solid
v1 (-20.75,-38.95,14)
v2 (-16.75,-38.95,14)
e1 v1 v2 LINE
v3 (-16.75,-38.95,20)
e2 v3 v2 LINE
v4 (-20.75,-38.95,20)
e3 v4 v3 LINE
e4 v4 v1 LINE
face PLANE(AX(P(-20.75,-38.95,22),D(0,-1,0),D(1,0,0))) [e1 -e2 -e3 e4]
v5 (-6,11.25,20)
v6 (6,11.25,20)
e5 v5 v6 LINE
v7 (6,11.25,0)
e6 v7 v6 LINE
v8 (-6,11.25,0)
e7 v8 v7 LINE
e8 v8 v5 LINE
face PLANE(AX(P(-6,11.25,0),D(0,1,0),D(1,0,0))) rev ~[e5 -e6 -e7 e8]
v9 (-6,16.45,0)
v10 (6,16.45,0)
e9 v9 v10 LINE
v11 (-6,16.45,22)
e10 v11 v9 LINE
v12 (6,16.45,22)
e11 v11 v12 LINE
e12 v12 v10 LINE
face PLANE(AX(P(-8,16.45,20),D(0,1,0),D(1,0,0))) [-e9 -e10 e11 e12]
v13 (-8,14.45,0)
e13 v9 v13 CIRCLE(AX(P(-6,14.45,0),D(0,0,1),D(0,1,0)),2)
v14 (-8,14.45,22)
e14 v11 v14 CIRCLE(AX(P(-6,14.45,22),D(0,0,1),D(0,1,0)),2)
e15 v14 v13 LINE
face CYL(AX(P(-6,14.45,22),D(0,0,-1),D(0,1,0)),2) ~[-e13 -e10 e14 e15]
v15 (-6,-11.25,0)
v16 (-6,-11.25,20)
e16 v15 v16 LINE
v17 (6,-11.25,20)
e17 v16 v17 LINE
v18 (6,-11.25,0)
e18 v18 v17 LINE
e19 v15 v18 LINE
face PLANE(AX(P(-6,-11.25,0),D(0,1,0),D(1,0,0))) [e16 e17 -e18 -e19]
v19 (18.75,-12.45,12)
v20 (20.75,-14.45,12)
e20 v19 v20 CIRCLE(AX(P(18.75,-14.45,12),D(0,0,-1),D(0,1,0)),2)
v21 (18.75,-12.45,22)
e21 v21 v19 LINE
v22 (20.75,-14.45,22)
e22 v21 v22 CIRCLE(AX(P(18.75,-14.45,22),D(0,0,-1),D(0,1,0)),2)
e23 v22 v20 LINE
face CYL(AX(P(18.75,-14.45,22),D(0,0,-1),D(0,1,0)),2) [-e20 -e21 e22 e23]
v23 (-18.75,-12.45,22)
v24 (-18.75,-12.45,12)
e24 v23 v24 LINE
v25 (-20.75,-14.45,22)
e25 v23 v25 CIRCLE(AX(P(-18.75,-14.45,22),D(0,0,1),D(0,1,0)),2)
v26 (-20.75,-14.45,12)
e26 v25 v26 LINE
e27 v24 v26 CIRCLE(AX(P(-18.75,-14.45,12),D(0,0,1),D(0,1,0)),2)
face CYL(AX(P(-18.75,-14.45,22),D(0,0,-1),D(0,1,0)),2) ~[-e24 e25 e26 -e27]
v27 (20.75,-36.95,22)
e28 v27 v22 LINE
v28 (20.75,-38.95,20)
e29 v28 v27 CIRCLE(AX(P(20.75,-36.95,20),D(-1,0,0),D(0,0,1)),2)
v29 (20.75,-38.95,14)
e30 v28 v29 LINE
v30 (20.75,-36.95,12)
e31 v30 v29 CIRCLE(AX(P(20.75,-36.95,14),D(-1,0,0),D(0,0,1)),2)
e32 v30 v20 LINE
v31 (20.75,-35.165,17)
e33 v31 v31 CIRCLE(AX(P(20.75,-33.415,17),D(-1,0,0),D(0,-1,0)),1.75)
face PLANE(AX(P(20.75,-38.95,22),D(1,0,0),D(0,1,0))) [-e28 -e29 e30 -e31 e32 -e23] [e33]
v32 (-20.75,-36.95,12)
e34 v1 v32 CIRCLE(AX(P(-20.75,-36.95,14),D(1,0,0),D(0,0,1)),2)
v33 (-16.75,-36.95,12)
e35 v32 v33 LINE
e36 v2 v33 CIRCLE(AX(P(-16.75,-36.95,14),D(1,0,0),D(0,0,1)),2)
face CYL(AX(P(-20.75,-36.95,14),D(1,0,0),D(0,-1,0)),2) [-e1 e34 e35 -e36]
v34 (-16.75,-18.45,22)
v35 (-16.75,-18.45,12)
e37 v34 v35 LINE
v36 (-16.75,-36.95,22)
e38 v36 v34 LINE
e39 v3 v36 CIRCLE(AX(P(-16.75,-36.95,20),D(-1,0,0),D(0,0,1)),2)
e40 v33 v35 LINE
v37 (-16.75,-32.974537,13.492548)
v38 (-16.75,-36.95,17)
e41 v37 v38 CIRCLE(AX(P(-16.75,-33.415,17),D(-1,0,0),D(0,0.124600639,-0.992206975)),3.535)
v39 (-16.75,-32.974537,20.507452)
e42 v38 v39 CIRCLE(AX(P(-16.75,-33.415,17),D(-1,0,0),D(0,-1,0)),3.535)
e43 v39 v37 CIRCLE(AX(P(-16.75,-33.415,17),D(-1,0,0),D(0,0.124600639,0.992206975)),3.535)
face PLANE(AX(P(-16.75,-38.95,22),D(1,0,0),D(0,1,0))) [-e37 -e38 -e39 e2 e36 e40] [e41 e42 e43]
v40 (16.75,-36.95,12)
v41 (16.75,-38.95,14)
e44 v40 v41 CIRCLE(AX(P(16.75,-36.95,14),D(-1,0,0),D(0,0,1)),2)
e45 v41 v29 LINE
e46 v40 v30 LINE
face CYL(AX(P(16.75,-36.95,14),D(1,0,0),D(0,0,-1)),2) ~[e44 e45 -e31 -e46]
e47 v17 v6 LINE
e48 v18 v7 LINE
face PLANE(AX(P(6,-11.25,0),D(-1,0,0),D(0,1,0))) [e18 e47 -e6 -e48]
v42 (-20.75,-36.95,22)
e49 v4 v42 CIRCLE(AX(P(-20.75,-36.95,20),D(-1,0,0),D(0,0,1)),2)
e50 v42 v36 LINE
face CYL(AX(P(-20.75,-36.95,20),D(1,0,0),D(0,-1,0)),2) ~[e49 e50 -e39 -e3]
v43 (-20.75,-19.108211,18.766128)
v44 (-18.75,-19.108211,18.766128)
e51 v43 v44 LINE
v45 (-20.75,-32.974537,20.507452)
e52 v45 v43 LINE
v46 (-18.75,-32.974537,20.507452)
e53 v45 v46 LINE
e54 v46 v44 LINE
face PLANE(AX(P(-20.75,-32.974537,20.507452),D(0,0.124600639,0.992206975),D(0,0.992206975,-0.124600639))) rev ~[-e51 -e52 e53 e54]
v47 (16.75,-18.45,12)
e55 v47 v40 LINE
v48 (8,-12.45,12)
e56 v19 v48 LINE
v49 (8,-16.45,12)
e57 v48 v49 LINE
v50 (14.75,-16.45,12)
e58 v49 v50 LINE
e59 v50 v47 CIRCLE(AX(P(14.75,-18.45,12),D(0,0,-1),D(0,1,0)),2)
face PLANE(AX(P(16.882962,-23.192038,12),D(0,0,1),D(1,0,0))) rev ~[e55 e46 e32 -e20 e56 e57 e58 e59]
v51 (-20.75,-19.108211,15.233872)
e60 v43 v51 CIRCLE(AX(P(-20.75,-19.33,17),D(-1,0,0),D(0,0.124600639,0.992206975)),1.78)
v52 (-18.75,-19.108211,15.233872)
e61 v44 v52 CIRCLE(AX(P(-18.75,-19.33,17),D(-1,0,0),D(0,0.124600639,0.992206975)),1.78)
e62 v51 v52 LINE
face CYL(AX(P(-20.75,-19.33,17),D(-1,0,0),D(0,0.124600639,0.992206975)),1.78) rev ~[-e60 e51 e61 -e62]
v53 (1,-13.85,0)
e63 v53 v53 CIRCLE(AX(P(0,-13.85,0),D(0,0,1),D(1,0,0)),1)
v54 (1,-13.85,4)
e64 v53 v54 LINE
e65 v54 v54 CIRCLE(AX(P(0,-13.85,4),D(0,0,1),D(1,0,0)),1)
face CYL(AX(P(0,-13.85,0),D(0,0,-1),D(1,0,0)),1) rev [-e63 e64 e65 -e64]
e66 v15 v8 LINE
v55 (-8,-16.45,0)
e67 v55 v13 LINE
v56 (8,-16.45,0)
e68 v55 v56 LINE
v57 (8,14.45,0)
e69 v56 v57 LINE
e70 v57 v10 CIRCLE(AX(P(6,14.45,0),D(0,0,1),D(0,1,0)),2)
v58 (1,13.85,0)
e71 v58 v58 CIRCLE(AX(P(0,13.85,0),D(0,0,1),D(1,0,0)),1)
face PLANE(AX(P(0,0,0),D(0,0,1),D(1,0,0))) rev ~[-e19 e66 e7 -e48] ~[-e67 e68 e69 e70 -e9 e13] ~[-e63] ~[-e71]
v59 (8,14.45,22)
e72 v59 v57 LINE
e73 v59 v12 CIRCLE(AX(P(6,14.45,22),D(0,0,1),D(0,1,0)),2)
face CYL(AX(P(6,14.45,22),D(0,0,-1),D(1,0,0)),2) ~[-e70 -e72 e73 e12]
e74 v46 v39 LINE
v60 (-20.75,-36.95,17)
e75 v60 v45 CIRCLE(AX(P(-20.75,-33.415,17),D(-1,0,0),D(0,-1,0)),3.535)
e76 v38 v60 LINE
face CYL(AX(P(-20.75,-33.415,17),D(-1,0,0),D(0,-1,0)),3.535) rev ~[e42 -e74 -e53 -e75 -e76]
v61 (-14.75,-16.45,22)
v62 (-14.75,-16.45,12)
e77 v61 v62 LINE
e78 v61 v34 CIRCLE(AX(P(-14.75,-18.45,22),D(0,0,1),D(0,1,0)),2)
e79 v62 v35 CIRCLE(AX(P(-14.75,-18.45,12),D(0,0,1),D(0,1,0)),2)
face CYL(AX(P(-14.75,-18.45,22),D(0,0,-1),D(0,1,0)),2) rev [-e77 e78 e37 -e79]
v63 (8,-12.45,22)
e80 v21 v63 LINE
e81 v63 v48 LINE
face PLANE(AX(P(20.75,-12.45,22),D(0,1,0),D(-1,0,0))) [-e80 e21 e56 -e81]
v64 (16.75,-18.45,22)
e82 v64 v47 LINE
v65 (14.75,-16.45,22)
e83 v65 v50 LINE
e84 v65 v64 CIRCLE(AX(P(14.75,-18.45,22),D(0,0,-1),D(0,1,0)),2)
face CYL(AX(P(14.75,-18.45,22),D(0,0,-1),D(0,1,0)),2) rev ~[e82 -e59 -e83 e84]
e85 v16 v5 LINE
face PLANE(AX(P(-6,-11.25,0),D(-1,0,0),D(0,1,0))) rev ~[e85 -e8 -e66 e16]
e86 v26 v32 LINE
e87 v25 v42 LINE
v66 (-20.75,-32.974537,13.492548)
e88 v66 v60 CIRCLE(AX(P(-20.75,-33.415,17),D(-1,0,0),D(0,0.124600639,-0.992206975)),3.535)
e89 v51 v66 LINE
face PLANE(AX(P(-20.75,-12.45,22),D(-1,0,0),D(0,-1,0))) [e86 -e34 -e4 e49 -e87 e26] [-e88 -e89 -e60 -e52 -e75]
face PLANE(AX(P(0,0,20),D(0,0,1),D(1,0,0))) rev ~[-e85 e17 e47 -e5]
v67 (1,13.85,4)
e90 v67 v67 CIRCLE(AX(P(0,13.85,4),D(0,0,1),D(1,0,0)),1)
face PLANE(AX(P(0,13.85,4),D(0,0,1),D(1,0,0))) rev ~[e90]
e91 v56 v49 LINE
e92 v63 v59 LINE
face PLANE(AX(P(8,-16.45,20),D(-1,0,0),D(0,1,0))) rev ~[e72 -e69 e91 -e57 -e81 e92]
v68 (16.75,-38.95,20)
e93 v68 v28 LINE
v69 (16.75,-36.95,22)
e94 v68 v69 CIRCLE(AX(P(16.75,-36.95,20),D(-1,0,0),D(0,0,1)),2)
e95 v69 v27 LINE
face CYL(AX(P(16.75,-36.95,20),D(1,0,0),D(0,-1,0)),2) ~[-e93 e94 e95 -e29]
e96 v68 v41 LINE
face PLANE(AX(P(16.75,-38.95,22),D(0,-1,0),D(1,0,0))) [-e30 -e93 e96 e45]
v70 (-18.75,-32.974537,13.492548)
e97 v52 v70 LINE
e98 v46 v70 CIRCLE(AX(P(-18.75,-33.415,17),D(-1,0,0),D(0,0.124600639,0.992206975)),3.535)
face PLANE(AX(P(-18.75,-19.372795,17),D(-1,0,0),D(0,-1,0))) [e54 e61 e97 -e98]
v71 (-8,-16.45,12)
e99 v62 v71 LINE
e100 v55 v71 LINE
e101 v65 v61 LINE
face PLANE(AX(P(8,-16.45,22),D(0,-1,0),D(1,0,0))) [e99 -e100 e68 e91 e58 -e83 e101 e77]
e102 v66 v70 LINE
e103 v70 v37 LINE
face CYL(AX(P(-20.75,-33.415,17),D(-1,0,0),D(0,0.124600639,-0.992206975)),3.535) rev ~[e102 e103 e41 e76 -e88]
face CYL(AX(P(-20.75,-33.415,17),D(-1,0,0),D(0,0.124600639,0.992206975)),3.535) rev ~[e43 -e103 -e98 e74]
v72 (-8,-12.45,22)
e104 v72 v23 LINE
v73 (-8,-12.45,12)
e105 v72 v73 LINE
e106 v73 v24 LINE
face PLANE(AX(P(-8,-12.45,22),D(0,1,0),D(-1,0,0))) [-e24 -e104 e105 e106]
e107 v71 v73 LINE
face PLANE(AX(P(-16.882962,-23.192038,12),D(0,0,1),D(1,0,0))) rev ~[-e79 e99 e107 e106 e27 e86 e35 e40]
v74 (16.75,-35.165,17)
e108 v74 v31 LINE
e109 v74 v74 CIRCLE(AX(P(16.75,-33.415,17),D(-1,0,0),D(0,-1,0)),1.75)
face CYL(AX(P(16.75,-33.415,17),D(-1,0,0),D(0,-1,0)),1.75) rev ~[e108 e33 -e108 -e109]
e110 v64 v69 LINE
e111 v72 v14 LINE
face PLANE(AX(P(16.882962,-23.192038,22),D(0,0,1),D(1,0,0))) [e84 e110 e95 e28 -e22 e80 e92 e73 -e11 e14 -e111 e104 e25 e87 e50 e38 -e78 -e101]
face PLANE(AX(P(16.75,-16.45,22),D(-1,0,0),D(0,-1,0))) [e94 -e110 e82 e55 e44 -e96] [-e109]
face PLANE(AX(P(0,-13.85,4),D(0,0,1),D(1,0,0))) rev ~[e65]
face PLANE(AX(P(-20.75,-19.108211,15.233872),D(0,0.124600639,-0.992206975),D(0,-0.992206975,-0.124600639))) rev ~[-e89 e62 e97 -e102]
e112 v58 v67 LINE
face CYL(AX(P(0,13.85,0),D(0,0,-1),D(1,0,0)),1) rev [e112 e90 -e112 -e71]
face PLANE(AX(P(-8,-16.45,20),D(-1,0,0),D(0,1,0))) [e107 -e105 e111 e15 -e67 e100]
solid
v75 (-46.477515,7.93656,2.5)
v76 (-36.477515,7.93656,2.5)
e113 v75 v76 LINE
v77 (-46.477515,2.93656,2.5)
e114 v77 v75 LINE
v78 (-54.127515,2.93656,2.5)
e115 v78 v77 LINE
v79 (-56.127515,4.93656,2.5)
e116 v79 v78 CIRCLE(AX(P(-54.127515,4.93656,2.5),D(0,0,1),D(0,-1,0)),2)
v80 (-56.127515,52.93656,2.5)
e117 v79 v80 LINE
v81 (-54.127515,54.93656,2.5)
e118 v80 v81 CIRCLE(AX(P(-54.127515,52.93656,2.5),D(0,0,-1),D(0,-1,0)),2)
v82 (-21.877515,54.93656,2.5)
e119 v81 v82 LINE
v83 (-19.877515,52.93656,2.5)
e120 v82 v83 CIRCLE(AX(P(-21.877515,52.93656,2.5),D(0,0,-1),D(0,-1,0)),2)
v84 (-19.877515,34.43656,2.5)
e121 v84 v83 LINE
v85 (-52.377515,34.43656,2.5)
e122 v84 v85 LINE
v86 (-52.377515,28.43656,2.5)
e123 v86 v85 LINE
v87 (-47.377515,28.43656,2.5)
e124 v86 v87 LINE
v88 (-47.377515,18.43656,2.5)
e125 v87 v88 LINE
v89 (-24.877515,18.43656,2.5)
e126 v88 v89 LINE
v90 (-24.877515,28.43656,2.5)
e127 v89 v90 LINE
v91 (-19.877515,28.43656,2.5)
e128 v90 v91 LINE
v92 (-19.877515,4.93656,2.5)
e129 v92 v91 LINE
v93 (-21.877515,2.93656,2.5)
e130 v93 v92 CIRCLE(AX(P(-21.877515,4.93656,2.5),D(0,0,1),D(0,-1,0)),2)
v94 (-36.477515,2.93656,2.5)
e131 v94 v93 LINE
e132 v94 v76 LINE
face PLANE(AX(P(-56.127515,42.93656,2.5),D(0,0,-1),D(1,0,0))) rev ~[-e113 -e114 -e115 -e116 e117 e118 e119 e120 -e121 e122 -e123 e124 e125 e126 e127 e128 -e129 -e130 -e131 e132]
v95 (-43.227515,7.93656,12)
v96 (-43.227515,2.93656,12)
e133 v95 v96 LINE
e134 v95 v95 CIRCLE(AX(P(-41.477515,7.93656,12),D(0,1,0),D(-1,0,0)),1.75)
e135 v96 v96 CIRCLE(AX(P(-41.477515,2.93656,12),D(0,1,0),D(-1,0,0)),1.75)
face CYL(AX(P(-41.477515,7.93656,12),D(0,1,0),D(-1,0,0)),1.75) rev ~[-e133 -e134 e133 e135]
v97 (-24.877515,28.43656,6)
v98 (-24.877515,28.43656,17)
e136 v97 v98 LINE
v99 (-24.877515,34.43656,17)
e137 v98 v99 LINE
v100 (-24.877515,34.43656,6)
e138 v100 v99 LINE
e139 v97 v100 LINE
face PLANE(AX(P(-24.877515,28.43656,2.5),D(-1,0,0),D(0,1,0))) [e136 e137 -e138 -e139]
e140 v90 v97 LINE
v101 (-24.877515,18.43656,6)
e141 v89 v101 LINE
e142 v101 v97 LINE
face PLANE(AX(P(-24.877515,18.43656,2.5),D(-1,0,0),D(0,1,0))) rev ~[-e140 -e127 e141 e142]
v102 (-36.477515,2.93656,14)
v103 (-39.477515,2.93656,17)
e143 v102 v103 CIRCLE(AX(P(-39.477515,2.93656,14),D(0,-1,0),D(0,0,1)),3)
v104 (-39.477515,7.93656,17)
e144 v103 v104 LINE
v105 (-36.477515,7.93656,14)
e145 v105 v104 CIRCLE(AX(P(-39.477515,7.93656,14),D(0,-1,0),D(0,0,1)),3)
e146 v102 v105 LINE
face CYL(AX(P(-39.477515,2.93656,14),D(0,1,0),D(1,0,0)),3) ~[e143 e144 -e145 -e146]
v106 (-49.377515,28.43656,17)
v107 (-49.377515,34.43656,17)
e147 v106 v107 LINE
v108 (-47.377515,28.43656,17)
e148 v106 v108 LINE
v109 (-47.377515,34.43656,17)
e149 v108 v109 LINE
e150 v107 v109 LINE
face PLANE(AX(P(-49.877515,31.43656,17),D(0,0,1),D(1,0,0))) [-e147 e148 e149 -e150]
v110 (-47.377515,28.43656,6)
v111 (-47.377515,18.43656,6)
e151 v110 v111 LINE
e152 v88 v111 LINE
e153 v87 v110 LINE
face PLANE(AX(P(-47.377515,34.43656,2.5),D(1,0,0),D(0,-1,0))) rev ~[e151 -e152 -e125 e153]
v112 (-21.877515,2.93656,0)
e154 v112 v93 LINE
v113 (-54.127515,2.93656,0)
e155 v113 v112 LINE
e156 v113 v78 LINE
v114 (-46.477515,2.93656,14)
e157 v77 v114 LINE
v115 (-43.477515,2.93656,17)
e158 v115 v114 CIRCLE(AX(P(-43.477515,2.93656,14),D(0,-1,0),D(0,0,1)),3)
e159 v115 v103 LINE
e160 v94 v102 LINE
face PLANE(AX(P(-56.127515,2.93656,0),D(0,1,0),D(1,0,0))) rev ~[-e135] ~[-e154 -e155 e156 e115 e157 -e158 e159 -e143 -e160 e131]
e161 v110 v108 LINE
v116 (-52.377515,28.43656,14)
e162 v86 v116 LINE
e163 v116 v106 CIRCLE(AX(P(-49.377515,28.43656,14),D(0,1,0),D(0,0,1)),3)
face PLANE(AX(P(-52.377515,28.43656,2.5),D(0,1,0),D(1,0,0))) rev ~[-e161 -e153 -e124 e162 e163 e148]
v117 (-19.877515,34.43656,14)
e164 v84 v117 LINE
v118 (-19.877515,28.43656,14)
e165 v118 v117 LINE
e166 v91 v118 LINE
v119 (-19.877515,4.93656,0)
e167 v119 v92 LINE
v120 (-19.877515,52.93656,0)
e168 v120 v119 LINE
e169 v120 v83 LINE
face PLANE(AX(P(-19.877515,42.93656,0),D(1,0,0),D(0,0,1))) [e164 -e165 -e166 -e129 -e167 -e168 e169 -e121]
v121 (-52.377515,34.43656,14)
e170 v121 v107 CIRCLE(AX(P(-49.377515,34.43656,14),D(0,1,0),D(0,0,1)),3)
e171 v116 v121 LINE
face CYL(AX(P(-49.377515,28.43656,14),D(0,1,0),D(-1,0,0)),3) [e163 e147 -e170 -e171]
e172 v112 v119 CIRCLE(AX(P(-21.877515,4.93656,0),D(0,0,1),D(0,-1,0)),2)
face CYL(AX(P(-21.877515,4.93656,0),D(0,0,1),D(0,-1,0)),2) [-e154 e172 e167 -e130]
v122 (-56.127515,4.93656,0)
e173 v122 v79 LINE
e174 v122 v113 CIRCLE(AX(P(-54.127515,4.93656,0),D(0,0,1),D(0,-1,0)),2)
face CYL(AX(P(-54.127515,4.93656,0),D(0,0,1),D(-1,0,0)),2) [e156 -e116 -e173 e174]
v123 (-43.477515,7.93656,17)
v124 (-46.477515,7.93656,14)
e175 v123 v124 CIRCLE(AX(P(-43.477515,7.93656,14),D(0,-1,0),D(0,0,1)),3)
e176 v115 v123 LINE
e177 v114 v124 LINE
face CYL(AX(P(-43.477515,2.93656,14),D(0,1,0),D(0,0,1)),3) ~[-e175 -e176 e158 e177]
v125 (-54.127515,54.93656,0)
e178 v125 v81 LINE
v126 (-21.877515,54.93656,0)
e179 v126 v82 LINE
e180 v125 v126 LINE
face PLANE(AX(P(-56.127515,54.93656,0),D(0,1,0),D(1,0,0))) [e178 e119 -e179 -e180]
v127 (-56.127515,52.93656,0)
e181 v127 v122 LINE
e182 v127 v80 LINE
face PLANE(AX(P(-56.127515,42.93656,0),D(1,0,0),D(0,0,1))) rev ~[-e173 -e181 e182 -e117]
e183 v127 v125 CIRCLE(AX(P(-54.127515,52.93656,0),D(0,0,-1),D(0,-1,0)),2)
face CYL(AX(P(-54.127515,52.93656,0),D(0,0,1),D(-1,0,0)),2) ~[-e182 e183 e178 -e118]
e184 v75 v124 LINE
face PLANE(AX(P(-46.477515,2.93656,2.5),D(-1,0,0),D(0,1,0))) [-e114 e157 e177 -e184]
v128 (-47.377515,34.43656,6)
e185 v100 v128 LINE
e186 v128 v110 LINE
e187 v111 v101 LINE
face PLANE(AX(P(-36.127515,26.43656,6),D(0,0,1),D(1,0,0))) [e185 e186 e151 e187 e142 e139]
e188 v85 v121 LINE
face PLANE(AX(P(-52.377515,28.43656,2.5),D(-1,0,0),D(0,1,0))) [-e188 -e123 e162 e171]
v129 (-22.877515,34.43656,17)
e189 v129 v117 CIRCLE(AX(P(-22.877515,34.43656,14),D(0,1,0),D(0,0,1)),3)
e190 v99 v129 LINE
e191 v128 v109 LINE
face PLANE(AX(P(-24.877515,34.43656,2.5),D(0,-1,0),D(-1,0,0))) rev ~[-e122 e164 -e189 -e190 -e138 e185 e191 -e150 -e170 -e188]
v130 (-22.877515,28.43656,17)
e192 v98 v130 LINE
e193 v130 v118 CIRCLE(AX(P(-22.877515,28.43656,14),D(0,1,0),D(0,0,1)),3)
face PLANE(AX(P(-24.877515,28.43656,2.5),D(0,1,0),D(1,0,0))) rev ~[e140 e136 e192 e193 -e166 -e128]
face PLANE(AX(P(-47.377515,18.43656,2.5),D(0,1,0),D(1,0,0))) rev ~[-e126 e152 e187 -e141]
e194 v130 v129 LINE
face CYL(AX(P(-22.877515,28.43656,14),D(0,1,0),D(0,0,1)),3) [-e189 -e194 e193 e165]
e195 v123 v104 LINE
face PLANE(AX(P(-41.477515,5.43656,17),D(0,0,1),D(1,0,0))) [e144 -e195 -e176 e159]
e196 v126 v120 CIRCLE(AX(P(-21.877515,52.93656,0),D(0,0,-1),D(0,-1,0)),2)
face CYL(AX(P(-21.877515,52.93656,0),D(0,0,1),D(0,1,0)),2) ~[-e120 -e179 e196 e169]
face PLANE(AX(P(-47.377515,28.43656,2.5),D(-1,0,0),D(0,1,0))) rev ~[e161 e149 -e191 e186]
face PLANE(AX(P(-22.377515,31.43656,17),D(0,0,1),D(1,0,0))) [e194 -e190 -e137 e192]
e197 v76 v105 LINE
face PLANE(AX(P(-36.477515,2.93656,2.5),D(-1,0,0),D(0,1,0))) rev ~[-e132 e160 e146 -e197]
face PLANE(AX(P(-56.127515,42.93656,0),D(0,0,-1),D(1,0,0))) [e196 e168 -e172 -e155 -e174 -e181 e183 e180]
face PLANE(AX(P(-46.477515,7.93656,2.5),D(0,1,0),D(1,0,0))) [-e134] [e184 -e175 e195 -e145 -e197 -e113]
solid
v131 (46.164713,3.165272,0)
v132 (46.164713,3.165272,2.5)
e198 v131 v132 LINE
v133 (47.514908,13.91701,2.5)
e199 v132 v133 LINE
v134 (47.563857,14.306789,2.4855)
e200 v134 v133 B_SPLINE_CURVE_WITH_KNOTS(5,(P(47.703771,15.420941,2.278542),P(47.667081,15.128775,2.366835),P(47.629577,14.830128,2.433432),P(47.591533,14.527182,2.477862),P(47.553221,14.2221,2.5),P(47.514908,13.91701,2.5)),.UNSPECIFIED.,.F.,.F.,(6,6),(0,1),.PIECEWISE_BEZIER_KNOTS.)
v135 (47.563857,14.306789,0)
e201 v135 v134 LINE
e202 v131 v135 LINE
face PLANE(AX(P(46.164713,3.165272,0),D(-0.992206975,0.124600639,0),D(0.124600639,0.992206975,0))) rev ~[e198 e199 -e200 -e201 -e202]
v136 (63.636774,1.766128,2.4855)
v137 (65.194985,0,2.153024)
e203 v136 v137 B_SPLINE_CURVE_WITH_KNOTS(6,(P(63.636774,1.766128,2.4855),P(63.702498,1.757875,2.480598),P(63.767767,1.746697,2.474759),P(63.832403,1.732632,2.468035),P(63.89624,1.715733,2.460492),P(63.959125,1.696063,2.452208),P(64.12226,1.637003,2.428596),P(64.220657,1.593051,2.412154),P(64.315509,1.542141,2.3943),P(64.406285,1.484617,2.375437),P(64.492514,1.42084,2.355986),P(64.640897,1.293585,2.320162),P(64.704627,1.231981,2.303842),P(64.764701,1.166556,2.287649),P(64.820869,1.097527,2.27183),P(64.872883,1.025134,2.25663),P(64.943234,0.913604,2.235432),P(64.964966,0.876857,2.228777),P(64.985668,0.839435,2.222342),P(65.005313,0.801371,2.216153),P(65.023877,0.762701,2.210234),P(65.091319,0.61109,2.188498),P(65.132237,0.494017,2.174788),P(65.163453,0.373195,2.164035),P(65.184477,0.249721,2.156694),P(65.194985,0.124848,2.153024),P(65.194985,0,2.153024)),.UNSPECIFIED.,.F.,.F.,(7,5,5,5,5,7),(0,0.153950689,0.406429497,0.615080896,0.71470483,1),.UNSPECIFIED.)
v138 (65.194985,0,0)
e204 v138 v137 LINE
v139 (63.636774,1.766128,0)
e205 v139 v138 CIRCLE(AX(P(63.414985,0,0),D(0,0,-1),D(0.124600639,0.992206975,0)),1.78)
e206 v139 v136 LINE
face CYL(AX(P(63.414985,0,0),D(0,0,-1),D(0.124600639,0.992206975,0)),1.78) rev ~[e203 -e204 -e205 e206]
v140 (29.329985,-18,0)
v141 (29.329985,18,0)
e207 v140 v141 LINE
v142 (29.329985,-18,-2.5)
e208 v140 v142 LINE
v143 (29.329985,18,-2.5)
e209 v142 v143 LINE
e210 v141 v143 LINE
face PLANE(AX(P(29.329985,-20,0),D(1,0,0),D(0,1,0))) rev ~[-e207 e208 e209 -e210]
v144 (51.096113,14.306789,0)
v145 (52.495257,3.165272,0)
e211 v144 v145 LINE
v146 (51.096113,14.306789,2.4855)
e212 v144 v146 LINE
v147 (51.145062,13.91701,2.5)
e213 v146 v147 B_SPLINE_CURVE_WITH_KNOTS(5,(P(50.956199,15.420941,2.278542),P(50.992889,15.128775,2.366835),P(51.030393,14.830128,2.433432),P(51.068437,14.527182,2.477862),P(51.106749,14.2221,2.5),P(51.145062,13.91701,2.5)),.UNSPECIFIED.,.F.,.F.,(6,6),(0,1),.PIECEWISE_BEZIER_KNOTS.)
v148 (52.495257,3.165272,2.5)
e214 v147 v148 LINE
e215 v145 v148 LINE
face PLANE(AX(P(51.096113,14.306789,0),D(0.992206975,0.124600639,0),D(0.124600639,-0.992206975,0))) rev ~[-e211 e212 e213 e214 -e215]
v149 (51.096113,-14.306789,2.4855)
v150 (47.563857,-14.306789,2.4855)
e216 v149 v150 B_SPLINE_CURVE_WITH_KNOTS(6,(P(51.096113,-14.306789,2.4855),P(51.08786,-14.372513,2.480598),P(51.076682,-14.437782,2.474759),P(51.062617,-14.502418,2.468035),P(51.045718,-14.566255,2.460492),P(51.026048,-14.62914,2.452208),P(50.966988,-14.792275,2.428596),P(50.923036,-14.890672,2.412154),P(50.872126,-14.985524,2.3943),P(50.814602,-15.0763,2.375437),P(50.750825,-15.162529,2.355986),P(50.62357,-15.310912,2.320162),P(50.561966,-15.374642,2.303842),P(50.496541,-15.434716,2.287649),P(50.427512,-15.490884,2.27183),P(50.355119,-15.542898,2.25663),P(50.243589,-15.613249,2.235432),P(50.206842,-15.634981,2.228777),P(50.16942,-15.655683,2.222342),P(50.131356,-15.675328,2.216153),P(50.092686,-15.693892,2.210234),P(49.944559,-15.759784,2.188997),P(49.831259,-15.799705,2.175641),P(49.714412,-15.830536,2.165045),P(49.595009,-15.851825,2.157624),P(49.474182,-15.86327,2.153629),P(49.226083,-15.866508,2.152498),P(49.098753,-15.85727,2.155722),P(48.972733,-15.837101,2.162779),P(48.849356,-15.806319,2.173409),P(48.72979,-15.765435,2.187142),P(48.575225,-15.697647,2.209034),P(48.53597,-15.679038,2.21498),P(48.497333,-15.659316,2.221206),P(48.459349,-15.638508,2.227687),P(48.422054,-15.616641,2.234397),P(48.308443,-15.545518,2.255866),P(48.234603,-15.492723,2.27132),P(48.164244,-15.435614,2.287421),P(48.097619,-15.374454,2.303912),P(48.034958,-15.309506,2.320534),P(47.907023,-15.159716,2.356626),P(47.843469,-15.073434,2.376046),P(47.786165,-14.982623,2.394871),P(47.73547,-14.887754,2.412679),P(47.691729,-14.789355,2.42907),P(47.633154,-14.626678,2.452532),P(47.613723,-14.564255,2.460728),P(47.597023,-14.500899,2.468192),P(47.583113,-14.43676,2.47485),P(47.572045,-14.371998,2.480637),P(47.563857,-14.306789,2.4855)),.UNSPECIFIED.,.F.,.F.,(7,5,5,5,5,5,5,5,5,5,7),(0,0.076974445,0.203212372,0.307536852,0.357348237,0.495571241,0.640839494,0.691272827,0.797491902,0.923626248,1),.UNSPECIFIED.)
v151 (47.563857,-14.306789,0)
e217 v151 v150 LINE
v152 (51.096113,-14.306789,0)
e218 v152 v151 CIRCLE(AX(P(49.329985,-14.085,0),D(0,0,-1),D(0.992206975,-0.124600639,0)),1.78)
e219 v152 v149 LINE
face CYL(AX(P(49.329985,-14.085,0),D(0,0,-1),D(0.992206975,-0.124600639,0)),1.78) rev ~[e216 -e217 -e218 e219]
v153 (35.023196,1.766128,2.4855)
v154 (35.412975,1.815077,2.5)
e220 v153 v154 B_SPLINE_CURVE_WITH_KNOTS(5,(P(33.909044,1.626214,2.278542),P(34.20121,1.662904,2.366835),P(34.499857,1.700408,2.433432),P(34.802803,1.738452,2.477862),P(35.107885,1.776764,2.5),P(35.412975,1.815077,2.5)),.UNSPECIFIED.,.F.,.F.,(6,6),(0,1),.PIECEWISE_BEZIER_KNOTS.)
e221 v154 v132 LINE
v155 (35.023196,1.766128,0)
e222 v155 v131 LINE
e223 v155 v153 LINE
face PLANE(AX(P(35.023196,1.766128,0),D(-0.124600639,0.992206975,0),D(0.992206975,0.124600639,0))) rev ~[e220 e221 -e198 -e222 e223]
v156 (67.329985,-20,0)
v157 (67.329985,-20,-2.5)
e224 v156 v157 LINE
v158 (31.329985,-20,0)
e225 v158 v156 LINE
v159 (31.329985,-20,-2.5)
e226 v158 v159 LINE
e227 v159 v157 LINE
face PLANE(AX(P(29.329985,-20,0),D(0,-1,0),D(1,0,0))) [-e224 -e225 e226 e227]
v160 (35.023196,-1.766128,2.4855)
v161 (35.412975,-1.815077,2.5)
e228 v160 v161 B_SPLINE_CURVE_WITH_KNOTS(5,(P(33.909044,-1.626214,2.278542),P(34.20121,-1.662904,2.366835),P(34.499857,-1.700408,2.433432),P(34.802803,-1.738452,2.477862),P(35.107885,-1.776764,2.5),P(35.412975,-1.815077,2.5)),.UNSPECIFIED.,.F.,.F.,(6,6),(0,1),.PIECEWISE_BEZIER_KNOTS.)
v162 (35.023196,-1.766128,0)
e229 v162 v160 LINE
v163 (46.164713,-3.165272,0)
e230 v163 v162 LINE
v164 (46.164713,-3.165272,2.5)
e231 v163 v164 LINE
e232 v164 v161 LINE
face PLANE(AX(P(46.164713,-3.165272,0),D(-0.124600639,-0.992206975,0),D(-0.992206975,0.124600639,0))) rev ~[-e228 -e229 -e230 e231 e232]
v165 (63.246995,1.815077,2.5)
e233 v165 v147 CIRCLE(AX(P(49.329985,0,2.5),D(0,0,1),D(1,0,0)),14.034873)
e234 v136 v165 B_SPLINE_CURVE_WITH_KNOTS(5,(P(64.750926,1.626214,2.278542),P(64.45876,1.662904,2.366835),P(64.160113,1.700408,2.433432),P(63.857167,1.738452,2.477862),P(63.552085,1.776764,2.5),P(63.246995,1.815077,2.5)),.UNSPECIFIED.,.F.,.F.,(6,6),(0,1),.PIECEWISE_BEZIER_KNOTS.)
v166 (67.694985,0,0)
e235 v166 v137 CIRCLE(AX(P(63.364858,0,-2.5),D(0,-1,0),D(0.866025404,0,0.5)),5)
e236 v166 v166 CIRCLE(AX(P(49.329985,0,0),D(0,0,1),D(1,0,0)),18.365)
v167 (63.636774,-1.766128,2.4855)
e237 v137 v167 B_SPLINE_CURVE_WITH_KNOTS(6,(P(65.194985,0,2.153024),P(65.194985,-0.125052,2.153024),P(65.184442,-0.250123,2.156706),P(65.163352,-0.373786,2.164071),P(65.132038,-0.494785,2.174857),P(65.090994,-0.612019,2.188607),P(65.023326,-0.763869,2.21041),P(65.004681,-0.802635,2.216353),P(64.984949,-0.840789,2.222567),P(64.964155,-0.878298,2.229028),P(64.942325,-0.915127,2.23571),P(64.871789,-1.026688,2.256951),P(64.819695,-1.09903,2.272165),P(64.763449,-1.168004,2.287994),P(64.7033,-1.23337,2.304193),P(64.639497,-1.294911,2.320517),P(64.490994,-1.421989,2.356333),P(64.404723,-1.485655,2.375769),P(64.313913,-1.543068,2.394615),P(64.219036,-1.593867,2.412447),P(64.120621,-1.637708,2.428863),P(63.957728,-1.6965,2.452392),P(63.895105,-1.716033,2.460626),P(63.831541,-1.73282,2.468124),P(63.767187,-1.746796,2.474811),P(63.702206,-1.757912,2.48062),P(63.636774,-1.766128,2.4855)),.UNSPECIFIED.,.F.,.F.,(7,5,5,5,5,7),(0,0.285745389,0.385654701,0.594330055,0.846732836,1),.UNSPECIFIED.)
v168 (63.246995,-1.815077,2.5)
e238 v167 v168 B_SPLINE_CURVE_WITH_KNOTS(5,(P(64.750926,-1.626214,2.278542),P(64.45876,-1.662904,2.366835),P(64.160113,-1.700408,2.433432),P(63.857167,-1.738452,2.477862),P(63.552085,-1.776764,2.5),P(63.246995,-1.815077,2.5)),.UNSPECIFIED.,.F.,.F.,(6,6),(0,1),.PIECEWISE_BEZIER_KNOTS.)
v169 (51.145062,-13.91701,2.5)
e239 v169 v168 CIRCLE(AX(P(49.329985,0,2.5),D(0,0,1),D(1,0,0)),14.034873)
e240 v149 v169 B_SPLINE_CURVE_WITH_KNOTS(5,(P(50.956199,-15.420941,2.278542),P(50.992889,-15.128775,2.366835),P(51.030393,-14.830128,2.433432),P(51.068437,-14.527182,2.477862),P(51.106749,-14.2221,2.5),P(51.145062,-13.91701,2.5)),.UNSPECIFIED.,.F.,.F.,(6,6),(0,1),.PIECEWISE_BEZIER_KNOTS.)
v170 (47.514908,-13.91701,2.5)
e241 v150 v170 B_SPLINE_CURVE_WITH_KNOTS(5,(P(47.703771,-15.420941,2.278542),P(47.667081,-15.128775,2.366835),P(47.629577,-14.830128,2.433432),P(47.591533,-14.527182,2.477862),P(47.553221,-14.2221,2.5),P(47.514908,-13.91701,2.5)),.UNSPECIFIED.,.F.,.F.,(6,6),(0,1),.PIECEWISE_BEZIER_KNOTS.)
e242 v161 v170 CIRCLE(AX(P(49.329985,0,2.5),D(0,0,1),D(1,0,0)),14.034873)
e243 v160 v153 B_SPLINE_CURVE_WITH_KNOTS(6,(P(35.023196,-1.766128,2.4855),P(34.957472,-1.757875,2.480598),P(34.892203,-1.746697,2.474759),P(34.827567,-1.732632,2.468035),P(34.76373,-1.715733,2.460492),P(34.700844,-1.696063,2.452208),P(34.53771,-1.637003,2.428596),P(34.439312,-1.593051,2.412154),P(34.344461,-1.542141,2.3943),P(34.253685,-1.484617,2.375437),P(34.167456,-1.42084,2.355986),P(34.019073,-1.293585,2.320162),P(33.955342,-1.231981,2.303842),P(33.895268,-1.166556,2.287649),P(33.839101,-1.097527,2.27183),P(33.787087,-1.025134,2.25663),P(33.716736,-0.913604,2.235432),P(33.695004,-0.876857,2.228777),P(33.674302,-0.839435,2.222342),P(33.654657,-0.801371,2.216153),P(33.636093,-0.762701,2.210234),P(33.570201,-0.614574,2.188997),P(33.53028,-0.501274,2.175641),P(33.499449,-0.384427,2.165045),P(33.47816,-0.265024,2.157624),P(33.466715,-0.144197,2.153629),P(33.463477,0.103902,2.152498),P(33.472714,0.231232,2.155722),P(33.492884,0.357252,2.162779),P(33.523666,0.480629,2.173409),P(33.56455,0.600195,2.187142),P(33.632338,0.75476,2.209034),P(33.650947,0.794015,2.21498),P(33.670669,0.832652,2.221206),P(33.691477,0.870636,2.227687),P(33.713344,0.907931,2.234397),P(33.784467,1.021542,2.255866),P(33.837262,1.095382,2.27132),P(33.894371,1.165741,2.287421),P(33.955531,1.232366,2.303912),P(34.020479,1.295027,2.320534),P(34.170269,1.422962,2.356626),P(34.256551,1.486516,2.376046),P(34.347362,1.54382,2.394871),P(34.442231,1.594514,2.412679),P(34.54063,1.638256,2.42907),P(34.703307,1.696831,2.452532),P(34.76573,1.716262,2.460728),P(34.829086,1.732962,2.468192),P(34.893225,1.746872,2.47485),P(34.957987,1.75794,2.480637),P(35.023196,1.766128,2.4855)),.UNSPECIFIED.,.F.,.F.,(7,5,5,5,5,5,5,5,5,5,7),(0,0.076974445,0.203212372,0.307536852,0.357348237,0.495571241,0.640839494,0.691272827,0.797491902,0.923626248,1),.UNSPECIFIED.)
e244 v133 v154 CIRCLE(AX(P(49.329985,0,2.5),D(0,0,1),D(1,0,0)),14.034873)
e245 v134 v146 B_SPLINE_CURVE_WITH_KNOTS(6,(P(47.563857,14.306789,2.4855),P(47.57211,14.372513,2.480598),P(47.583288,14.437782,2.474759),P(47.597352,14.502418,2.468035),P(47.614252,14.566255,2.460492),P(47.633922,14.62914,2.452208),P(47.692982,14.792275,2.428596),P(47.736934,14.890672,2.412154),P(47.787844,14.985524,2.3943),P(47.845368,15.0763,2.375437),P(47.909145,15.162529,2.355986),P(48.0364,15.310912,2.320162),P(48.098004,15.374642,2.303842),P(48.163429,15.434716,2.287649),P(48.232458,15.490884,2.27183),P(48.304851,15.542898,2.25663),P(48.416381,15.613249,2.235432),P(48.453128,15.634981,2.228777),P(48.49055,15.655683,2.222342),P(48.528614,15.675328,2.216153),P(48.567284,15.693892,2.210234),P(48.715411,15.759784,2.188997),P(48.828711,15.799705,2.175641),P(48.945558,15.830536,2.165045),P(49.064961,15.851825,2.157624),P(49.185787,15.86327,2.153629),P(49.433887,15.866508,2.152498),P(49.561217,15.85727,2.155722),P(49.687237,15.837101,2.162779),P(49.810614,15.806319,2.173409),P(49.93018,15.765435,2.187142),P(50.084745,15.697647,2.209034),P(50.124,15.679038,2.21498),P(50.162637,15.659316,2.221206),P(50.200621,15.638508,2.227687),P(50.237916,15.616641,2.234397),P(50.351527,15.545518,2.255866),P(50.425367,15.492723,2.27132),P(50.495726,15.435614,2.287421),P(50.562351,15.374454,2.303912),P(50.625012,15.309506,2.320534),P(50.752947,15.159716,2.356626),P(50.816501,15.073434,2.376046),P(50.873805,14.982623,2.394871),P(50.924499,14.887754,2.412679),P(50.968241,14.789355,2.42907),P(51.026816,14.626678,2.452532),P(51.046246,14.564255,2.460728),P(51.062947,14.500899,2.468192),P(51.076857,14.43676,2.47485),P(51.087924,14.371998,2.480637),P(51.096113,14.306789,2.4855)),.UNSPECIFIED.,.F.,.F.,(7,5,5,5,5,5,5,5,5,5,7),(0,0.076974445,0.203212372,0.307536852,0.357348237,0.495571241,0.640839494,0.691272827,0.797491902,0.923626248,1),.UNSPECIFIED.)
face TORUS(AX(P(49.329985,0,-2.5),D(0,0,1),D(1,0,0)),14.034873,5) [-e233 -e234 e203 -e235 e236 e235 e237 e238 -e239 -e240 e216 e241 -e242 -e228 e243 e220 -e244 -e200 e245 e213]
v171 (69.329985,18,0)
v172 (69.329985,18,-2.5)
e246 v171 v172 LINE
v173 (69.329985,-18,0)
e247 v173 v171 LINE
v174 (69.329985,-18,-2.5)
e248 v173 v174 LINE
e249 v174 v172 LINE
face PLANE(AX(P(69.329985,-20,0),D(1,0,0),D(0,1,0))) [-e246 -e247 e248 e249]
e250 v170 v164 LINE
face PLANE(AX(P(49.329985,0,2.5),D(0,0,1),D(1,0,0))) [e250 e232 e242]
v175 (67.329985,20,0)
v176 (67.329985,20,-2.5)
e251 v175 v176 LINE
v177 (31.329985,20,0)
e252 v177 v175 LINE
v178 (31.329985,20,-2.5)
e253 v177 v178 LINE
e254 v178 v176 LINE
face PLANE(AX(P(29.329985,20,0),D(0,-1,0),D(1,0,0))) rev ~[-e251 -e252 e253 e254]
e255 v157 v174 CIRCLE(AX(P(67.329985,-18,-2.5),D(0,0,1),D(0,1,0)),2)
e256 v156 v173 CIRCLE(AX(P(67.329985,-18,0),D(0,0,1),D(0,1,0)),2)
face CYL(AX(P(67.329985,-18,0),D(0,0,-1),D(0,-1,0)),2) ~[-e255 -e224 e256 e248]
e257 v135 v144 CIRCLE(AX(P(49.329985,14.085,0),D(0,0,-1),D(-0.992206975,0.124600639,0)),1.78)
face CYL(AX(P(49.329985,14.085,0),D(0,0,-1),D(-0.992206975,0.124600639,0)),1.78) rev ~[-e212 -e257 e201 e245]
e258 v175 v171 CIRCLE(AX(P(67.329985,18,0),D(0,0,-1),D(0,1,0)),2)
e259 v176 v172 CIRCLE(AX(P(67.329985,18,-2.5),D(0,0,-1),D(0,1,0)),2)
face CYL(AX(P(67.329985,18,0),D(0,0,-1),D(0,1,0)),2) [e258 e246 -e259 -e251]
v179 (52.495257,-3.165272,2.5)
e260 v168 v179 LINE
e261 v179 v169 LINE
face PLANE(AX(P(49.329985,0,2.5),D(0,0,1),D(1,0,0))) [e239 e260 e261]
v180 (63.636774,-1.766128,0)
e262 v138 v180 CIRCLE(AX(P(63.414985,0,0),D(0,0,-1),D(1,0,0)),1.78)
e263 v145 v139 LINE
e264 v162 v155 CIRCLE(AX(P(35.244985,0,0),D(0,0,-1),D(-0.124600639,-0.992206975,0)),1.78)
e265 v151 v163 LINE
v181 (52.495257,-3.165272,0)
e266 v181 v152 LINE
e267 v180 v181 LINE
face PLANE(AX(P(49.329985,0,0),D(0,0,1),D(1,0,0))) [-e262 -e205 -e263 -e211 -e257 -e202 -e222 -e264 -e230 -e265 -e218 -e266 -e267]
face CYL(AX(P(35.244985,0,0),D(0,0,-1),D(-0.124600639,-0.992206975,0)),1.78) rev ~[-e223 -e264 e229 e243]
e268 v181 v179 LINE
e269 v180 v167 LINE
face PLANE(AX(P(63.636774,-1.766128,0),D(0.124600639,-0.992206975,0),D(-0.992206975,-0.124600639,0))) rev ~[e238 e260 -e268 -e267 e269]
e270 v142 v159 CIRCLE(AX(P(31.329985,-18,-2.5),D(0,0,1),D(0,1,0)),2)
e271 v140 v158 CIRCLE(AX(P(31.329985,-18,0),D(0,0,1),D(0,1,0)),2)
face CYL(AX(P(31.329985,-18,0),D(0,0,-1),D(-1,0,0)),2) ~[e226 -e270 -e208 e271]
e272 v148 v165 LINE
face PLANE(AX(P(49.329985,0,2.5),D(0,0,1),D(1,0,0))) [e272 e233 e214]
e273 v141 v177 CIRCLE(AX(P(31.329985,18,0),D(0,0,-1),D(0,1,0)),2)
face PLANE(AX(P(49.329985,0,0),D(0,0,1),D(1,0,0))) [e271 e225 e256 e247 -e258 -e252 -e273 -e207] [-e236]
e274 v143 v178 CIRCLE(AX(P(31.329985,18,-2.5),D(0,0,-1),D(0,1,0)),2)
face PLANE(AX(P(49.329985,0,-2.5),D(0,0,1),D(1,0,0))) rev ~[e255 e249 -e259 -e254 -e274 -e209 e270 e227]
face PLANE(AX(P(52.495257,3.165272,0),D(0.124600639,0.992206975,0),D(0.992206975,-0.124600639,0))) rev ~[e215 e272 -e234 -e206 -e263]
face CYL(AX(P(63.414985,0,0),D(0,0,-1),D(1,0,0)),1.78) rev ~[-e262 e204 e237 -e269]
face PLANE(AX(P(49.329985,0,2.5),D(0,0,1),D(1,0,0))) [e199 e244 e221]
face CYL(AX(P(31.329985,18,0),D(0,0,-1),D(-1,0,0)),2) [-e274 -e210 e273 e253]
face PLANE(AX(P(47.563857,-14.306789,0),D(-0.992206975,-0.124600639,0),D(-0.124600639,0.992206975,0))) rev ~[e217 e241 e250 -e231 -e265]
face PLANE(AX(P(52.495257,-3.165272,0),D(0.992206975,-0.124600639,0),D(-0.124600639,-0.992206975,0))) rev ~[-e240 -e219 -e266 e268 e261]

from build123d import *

# Parameters (mm, degrees)
F0_W      = 16
F0_H      = 32.9
F0_R      = 1
F0_W_2    = 12
F0_H_2    = 22.5
F1_DEPTH  = 20
F2_DEPTH  = 4
F3_W      = 16
F3_H      = 32.9
F4_DEPTH  = 2
F6_DEPTH  = 10
F7_R      = 2
F9_DEPTH  = 2
F10_DEPTH = 4
F11_W     = 40
F11_H     = 40
F12_DEPTH = 2.5
F13_W     = 5
F13_H     = 6
F13_W_2   = 10
F13_H_2   = 5
F14_DEPTH = 14.5
F15_DEPTH = 3.5
F16_R     = 3
F17_DEPTH = 12
F18_DEPTH = 3.75
F19_R     = 1.75
F20_DEPTH = 4
F21_R     = 1.75
F22_DEPTH = 5
F23_W     = 40
F23_H     = 40
F24_DEPTH = 2.5
F25_R     = 18.365
F26_DEPTH = 2.5
F28_R     = 2
F29_R     = 2


# Not quite as in the source:
# - a fillet or chamfer that OpenCascade refuses, or shapes differently, is made with other operations: its cross-section is extruded or revolved along the edge and cut away or added


with BuildPart() as f1:
    # F0 (on Top) → F1 (new body)
    with BuildSketch(Plane.XY):
        Rectangle(F0_W, F0_H)
        with Locations((0, -13.85)):
            Circle(F0_R, mode=Mode.SUBTRACT)
        Rectangle(F0_W_2, F0_H_2, mode=Mode.SUBTRACT)
        with Locations((0, 13.85)):
            Circle(F0_R, mode=Mode.SUBTRACT)
        with Locations((0, 13.85)):
            Circle(F0_R)
        with Locations((0, -13.85)):
            Circle(F0_R)
    extrude(amount=F1_DEPTH)

    # F0 (on Top) → F2 (cut)
    with BuildSketch(Plane.XY):
        with Locations((0, 13.85)):
            Circle(F0_R)
        with Locations((0, -13.85)):
            Circle(F0_R)
    extrude(amount=F2_DEPTH, mode=Mode.SUBTRACT)

    # F3 (on face) → F4 (join)
    with BuildSketch(Plane.XY.offset(20)):
        Rectangle(F3_W, F3_H)
    extrude(amount=F4_DEPTH)

    # F5 (on face) → F6 (join)
    with BuildSketch(Plane.XY.offset(22)):
        Polygon((8, -12.45), (8, -16.45), (16.75, -16.45), (16.75, -38.95), (20.75, -38.95), (20.75, -12.45), align=None)
        Polygon((-16.75, -38.95), (-16.75, -16.45), (-8, -16.45), (-8, -12.45), (-20.75, -12.45), (-20.75, -38.95), align=None)
    extrude(amount=-F6_DEPTH)

    # F7
    f7_edges = [f1.edges().sort_by_distance(p)[0] for p in [
        (-20.75, -12.45, 17),
        (20.75, -12.45, 17),
        (18.75, -38.95, 22),
        (18.75, -38.95, 12),
        (-18.75, -38.95, 22),
        (-18.75, -38.95, 12),
        (-16.75, -16.45, 17),
        (16.75, -16.45, 17),
        (-8, 16.45, 11),
        (8, 16.45, 11),
    ]]
    fillet(f7_edges, radius=F7_R)

    # F8 (on face) → F9 (cut)
    with BuildSketch(Plane(origin=(-20.75, 0, 0), x_dir=(0, -1, 0), z_dir=(-1, 0, 0))):
        with BuildLine():
            ThreePointArc((21.11, 17), (20.5076279836, 18.3347630248), (19.1082108626, 18.7661284151))
            ThreePointArc((19.1082108626, 18.7661284151), (17.55, 17), (19.1082108626, 15.2338715849))
            ThreePointArc((19.1082108626, 15.2338715849), (20.5076279836, 15.6652369752), (21.11, 17))
        make_face()
        with BuildLine():
            ThreePointArc((32.9745367412, 13.4925483442), (29.88, 17), (32.9745367412, 20.5074516558))
            Line((32.9745367412, 20.5074516558), (19.1082108626, 18.7661284151))
            ThreePointArc((19.1082108626, 18.7661284151), (20.5076279836, 18.3347630248), (21.11, 17))
            ThreePointArc((21.11, 17), (20.5076279836, 15.6652369752), (19.1082108626, 15.2338715849))
            Line((19.1082108626, 15.2338715849), (32.9745367412, 13.4925483442))
        make_face()
        with BuildLine():
            ThreePointArc((32.9745367412, 13.4925483442), (35.7537162483, 14.3492206222), (36.95, 17))
            ThreePointArc((36.95, 17), (35.7537162483, 19.6507793778), (32.9745367412, 20.5074516558))
            ThreePointArc((32.9745367412, 20.5074516558), (29.88, 17), (32.9745367412, 13.4925483442))
        make_face()
    extrude(amount=-F9_DEPTH, mode=Mode.SUBTRACT)

    # F8 (on face) → F10 (cut, through all)
    with BuildSketch(Plane(origin=(-20.75, 0, 0), x_dir=(0, -1, 0), z_dir=(-1, 0, 0))):
        with BuildLine():
            ThreePointArc((32.9745367412, 13.4925483442), (35.7537162483, 14.3492206222), (36.95, 17))
            ThreePointArc((36.95, 17), (35.7537162483, 19.6507793778), (32.9745367412, 20.5074516558))
            ThreePointArc((32.9745367412, 20.5074516558), (29.88, 17), (32.9745367412, 13.4925483442))
        make_face()
    extrude(amount=-F10_DEPTH, mode=Mode.SUBTRACT)

    # F19 (on face) → F20 (cut, through all)
    with BuildSketch(Plane(origin=(16.75, 0, 0), x_dir=(0, -1, 0), z_dir=(-1, 0, 0))):
        with Locations((33.415, 17)):
            Circle(F19_R)
    extrude(amount=-F20_DEPTH, mode=Mode.SUBTRACT)


with BuildPart() as f12:
    # F11 (on Top) → F12 (new body)
    with BuildSketch(Plane.XY):
        with Locations((-36.1275146902, 22.9365597665)):
            Rectangle(F11_W, F11_H)
    extrude(amount=F12_DEPTH)

    # F13 (on face) → F14 (join)
    with BuildSketch(Plane.XY.offset(2.5)):
        with Locations((-49.8775146902, 31.4365597665)):
            Rectangle(F13_W, F13_H)
        with Locations((-22.3775146902, 31.4365597665)):
            Rectangle(F13_W, F13_H)
        with Locations((-41.4775146902, 5.4365597665)):
            Rectangle(F13_W_2, F13_H_2)
    extrude(amount=F14_DEPTH)

    # F13 (on face) → F15 (join)
    with BuildSketch(Plane.XY.offset(2.5)):
        Polygon((-24.8775146902, 34.4365597665), (-47.3775146902, 34.4365597665), (-47.3775146902, 28.4365597665), (-47.3775146902, 18.4365597665), (-24.8775146902, 18.4365597665), (-24.8775146902, 28.4365597665), align=None)
    extrude(amount=F15_DEPTH)

    # F16
    f16_edges = [f12.edges().sort_by_distance(p)[0] for p in [
        (-52.377515, 31.43656, 17),
        (-19.877515, 31.43656, 17),
        (-46.477515, 5.43656, 17),
        (-36.477515, 5.43656, 17),
    ]]
    fillet(f16_edges, radius=F16_R)

    # F17 (add): a face of the model
    f17_faces = [f12.faces().sort_by_distance(p)[0] for p in [
        (-36.1275146902, 42.9365597665, 1.25),
    ]]
    extrude(f17_faces, amount=F17_DEPTH)

    # F18 (cut, through all): a face of the model
    f18_faces = [f12.faces().sort_by_distance(p)[0] for p in [
        (-16.1275146902, 28.9365597665, 1.25),
    ]]
    extrude(f18_faces, amount=-F18_DEPTH, mode=Mode.SUBTRACT)

    # F21 (on face) → F22 (cut, through all)
    with BuildSketch(Plane(origin=(0, 7.9365597665, 0), x_dir=(-1, 0, 0), z_dir=(0, 1, 0))):
        with Locations((41.4775146902, 12)):
            Circle(F21_R)
    extrude(amount=-F22_DEPTH, mode=Mode.SUBTRACT)

    # F29
    f29_edges = [f12.edges().sort_by_distance(p)[0] for p in [
        (-56.127515, 2.93656, 1.25),
        (-19.877515, 2.93656, 1.25),
        (-19.877515, 54.93656, 1.25),
        (-56.127515, 54.93656, 1.25),
    ]]
    fillet(f29_edges, radius=F29_R)


with BuildPart() as f24:
    # F23 (on Top) → F24 (new body)
    with BuildSketch(Plane.XY):
        with Locations((49.3299849331, 0)):
            Rectangle(F23_W, F23_H)
        with BuildLine():
            ThreePointArc((35.0231957958, -1.7661284151), (33.4649849331, 0), (35.0231957958, 1.7661284151))
            Line((35.0231957958, 1.7661284151), (46.164712816, 3.1652721172))
            Line((46.164712816, 3.1652721172), (47.5638565181, 14.3067891374))
            ThreePointArc((47.5638565181, 14.3067891374), (49.3299849331, 15.865), (51.0961133482, 14.3067891374))
            Line((51.0961133482, 14.3067891374), (52.4952570503, 3.1652721172))
            Line((52.4952570503, 3.1652721172), (63.6367740705, 1.7661284151))
            ThreePointArc((63.6367740705, 1.7661284151), (64.7497479579, 1.1776279836), (65.1949849331, 0))
            ThreePointArc((65.1949849331, 0), (64.7497479579, -1.1776279836), (63.6367740705, -1.7661284151))
            Line((63.6367740705, -1.7661284151), (52.4952570503, -3.1652721172))
            Line((52.4952570503, -3.1652721172), (51.0961133482, -14.3067891374))
            ThreePointArc((51.0961133482, -14.3067891374), (49.3299849331, -15.865), (47.5638565181, -14.3067891374))
            Line((47.5638565181, -14.3067891374), (46.164712816, -3.1652721172))
            Line((46.164712816, -3.1652721172), (35.0231957958, -1.7661284151))
        make_face(mode=Mode.SUBTRACT)
        with BuildLine():
            ThreePointArc((35.0231957958, 1.7661284151), (36.4226129167, 1.3347630248), (37.0249849331, 0))
            ThreePointArc((37.0249849331, 0), (36.4226129167, -1.3347630248), (35.0231957958, -1.7661284151))
            Line((35.0231957958, -1.7661284151), (46.164712816, -3.1652721172))
            Line((46.164712816, -3.1652721172), (47.5638565181, -14.3067891374))
            ThreePointArc((47.5638565181, -14.3067891374), (49.21887368, -12.308471281), (51.1099849331, -14.085))
            ThreePointArc((51.1099849331, -14.085), (51.1065136521, -14.1961112532), (51.0961133482, -14.3067891374))
            Line((51.0961133482, -14.3067891374), (52.4952570503, -3.1652721172))
            Line((52.4952570503, -3.1652721172), (63.6367740705, -1.7661284151))
            ThreePointArc((63.6367740705, -1.7661284151), (61.6349849331, 0), (63.6367740705, 1.7661284151))
            Line((63.6367740705, 1.7661284151), (52.4952570503, 3.1652721172))
            Line((52.4952570503, 3.1652721172), (51.0961133482, 14.3067891374))
            ThreePointArc((51.0961133482, 14.3067891374), (51.1065136521, 14.1961112532), (51.1099849331, 14.085))
            ThreePointArc((51.1099849331, 14.085), (49.21887368, 12.308471281), (47.5638565181, 14.3067891374))
            Line((47.5638565181, 14.3067891374), (46.164712816, 3.1652721172))
            Line((46.164712816, 3.1652721172), (35.0231957958, 1.7661284151))
        make_face()
        with BuildLine():
            ThreePointArc((51.0961133482, 14.3067891374), (49.3299849331, 15.865), (47.5638565181, 14.3067891374))
            ThreePointArc((47.5638565181, 14.3067891374), (49.21887368, 12.308471281), (51.1099849331, 14.085))
            ThreePointArc((51.1099849331, 14.085), (51.1065136521, 14.1961112532), (51.0961133482, 14.3067891374))
        make_face()
        with BuildLine():
            ThreePointArc((35.0231957958, -1.7661284151), (36.4226129167, -1.3347630248), (37.0249849331, 0))
            ThreePointArc((37.0249849331, 0), (36.4226129167, 1.3347630248), (35.0231957958, 1.7661284151))
            ThreePointArc((35.0231957958, 1.7661284151), (33.4649849331, 0), (35.0231957958, -1.7661284151))
        make_face()
        with BuildLine():
            ThreePointArc((51.1099849331, -14.085), (49.21887368, -12.308471281), (47.5638565181, -14.3067891374))
            ThreePointArc((47.5638565181, -14.3067891374), (49.3299849331, -15.865), (51.0961133482, -14.3067891374))
            ThreePointArc((51.0961133482, -14.3067891374), (51.1065136521, -14.1961112532), (51.1099849331, -14.085))
        make_face()
        with BuildLine():
            ThreePointArc((65.1949849331, 0), (64.7497479579, 1.1776279836), (63.6367740705, 1.7661284151))
            ThreePointArc((63.6367740705, 1.7661284151), (61.6349849331, 0), (63.6367740705, -1.7661284151))
            ThreePointArc((63.6367740705, -1.7661284151), (64.7497479579, -1.1776279836), (65.1949849331, 0))
        make_face()
    extrude(amount=-F24_DEPTH)

    # F25 (on face) → F26 (join)
    with BuildSketch(Plane.XY):
        with Locations((49.3299849331, 0)):
            Circle(F25_R)
        with BuildLine():
            Line((46.164712816, -3.1652721172), (35.0231957958, -1.7661284151))
            ThreePointArc((35.0231957958, -1.7661284151), (33.4649849331, 0), (35.0231957958, 1.7661284151))
            Line((35.0231957958, 1.7661284151), (46.164712816, 3.1652721172))
            Line((46.164712816, 3.1652721172), (47.5638565181, 14.3067891374))
            ThreePointArc((47.5638565181, 14.3067891374), (49.3299849331, 15.865), (51.0961133482, 14.3067891374))
            Line((51.0961133482, 14.3067891374), (52.4952570503, 3.1652721172))
            Line((52.4952570503, 3.1652721172), (63.6367740705, 1.7661284151))
            ThreePointArc((63.6367740705, 1.7661284151), (64.7497479579, 1.1776279836), (65.1949849331, 0))
            ThreePointArc((65.1949849331, 0), (64.7497479579, -1.1776279836), (63.6367740705, -1.7661284151))
            Line((63.6367740705, -1.7661284151), (52.4952570503, -3.1652721172))
            Line((52.4952570503, -3.1652721172), (51.0961133482, -14.3067891374))
            ThreePointArc((51.0961133482, -14.3067891374), (49.3299849331, -15.865), (47.5638565181, -14.3067891374))
            Line((47.5638565181, -14.3067891374), (46.164712816, -3.1652721172))
        make_face(mode=Mode.SUBTRACT)
    extrude(amount=F26_DEPTH)

    # F27: fillet of radius 5 on 1 edges, made by hand

    # F27_s1 → F27_t2 (revolve, cut)
    with BuildSketch(Plane.XZ):
        with BuildLine():
            ThreePointArc((67.6949849331, 0), (65.8648579142, 1.8301270189), (63.3648579142, 2.5))
            Line((63.3648579142, 2.5), (67.6949849331, 2.5))
            Line((67.6949849331, 2.5), (67.6949849331, 0))
        make_face()
    revolve(axis=Axis((49.3299849331, 0, 2.5), (0, 0, 1)), mode=Mode.SUBTRACT)

    # F28
    f28_edges = [f24.edges().sort_by_distance(p)[0] for p in [
        (29.329985, 20, -1.25),
        (69.329985, 20, -1.25),
        (69.329985, -20, -1.25),
        (29.329985, -20, -1.25),
    ]]
    fillet(f28_edges, radius=F28_R)


solid = Compound([f1.part, f12.part, f24.part])
